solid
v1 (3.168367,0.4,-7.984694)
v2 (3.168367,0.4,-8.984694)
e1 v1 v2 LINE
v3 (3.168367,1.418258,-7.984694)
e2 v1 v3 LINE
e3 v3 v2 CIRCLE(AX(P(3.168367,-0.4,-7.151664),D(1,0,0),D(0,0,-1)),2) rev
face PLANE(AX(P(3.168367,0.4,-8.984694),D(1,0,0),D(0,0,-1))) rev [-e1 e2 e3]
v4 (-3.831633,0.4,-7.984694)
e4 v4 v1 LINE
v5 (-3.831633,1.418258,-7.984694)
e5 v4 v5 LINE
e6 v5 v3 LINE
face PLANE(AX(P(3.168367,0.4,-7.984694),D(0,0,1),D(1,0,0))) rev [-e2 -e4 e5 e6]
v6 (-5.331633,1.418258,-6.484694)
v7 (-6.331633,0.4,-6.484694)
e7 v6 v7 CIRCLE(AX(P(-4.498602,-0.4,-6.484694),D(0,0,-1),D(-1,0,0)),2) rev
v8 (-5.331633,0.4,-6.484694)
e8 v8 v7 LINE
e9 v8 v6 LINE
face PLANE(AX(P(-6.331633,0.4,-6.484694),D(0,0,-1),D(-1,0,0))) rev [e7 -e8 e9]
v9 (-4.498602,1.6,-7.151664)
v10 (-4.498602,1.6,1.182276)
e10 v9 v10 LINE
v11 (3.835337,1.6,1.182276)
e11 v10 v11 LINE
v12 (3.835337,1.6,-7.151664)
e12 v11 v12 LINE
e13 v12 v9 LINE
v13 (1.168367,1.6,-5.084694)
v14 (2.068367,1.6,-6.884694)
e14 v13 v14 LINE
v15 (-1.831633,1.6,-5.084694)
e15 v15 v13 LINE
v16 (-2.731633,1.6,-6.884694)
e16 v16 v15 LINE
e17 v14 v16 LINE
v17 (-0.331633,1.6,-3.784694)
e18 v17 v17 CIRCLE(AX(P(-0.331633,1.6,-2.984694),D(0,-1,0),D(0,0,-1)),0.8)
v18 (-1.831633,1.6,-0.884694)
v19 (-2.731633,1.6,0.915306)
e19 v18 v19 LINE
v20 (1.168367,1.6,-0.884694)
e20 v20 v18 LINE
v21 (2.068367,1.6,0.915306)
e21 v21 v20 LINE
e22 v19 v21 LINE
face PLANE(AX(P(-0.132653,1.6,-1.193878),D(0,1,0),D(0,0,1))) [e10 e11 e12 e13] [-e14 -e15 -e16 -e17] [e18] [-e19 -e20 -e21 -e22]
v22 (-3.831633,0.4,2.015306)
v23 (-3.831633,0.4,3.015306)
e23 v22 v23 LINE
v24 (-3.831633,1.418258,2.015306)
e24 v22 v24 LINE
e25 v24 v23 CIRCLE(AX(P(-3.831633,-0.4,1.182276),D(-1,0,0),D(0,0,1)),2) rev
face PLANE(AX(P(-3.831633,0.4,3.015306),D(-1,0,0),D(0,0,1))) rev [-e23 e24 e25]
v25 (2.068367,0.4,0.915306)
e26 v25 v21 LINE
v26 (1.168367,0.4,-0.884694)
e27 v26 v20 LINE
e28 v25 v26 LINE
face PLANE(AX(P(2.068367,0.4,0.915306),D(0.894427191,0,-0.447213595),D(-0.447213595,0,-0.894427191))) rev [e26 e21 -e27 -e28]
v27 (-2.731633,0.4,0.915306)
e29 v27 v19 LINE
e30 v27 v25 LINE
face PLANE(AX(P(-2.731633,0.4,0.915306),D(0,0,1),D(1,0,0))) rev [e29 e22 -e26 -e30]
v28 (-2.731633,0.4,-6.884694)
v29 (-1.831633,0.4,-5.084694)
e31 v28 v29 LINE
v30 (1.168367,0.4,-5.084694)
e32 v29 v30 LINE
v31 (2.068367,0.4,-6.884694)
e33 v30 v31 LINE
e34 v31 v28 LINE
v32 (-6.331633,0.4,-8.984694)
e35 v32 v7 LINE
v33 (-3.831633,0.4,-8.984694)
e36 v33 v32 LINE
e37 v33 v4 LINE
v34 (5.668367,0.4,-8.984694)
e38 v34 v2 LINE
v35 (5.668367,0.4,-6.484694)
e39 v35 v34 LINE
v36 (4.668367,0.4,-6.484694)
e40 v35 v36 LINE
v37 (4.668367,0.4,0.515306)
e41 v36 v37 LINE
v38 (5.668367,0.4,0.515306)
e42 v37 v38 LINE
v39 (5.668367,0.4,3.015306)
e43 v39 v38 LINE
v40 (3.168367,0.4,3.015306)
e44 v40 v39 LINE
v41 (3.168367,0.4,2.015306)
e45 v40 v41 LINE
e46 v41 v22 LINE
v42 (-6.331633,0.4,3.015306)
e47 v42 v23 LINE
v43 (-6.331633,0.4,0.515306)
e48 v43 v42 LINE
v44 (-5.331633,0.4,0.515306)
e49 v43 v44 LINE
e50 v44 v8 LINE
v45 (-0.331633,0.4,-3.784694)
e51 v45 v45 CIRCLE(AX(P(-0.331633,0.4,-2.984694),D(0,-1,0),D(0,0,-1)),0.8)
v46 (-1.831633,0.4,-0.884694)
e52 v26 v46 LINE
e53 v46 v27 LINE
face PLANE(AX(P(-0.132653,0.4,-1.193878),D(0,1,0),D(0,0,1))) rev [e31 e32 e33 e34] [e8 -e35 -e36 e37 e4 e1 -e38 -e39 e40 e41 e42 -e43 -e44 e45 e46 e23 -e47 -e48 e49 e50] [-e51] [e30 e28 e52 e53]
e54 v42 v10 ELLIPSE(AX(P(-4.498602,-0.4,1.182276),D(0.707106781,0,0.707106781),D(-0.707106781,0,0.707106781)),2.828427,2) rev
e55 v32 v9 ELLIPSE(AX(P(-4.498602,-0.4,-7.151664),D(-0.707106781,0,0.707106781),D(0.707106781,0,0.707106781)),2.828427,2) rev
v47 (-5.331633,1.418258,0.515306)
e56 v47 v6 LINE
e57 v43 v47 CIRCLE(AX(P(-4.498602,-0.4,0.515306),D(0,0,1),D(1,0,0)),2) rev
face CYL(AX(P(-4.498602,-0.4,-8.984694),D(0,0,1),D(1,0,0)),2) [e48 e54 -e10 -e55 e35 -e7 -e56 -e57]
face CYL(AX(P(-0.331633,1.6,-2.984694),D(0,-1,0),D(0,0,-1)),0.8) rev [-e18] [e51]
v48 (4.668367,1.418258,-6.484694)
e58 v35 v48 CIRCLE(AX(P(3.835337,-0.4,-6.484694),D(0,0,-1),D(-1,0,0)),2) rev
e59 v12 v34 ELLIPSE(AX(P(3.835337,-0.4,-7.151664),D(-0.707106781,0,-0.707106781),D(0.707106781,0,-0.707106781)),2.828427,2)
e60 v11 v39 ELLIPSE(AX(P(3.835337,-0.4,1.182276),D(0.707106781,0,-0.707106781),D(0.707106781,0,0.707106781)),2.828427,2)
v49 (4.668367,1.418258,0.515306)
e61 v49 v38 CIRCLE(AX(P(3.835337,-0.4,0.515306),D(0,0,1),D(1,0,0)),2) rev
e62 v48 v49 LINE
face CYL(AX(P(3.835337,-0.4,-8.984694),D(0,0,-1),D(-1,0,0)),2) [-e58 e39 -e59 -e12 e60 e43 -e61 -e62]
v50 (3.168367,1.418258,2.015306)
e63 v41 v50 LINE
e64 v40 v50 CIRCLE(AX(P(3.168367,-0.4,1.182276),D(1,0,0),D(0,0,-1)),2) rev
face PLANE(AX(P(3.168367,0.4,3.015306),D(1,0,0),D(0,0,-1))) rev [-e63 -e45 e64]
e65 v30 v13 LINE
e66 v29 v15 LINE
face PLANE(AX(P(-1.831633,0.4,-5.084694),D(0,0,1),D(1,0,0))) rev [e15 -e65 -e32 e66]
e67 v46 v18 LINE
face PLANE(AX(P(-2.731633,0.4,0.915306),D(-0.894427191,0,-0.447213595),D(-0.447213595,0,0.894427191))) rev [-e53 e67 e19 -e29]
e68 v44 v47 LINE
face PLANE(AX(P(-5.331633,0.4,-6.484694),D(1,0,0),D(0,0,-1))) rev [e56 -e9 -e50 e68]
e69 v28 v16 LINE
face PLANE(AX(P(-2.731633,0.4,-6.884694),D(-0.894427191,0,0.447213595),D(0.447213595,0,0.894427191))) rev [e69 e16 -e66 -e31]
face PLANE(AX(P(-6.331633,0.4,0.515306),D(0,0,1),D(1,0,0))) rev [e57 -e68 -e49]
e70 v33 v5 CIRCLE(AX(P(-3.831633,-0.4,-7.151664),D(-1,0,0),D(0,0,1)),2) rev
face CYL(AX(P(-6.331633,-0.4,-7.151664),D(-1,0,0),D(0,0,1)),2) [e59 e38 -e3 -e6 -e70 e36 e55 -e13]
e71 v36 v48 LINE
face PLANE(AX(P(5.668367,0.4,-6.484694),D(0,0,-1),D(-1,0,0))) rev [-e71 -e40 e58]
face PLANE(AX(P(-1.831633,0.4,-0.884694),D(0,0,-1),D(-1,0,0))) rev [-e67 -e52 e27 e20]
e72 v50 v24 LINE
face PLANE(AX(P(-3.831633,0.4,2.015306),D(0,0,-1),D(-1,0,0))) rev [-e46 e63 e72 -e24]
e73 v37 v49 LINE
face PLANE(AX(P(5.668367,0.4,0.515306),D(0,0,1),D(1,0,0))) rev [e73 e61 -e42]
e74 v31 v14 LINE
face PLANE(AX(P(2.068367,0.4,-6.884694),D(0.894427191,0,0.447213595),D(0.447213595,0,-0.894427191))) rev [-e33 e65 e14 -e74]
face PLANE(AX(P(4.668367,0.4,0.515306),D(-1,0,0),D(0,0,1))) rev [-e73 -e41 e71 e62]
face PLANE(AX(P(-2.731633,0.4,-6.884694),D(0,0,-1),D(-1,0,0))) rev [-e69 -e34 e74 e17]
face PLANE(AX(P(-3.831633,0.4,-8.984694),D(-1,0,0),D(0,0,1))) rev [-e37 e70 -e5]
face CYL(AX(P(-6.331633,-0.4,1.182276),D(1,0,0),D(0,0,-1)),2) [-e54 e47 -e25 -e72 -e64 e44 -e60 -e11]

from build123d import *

# Parameters (mm, degrees)
SKETCH_1_W          = 20
SKETCH_1_H          = 20
EXTRUDE_1_DEPTH     = 2
CUT_EXTRUDE_1_DEPTH = 17.713614462
SCALE_1_SCALE       = 0.6
SKETCH_5_W          = 7
SKETCH_5_H          = 1
SKETCH_5_W_2        = 1
SKETCH_5_H_2        = 7
CUT_EXTRUDE_2_DEPTH = 12.05686647
FILLET_1_R          = 2
SKETCH_6_R          = 0.8
CUT_EXTRUDE_3_DEPTH = 12.05686647


with BuildPart() as part:
    # 草图1 → 凸台-拉伸1 (new body)
    with BuildSketch(Plane(origin=(0, 0, 0), x_dir=(1, 0, 0), z_dir=(0, 1, 0))):
        with Locations((-0.331632653, 2.984693878)):
            Rectangle(SKETCH_1_W, SKETCH_1_H)
    extrude(amount=EXTRUDE_1_DEPTH)

    # 草图2 → 切除-拉伸1 (cut, through all)
    with BuildSketch(Plane(origin=(0, 2, 0), x_dir=(1, 0, 0), z_dir=(0, 1, 0))):
        Polygon((-4.331632653, 9.484693878), (3.668367347, 9.484693878), (2.168367347, 6.484693878), (-2.831632653, 6.484693878), align=None)
        Polygon((3.668367347, -3.515306122), (2.168367347, -0.515306122), (-2.831632653, -0.515306122), (-4.331632653, -3.515306122), align=None)
    extrude(amount=-CUT_EXTRUDE_1_DEPTH, mode=Mode.SUBTRACT)


with BuildPart() as part_1:
    # 缩放比例1: scaled about (-0.331632653, 1, -2.984693878)
    add(part.part.scale(SCALE_1_SCALE).moved(Location((-0.132653061, 0.4, -1.193877551))))

    # 草图5 → 切除-拉伸2 (cut, through all)
    with BuildSketch(Plane(origin=(0, 1.6, 0), x_dir=(1, 0, 0), z_dir=(0, 1, 0))):
        with Locations((-0.331632653, -2.515306122)):
            Rectangle(SKETCH_5_W, SKETCH_5_H)
        with Locations((-5.831632653, 2.984693878)):
            Rectangle(SKETCH_5_W_2, SKETCH_5_H_2)
        with Locations((-0.331632653, 8.484693878)):
            Rectangle(SKETCH_5_W, SKETCH_5_H)
        with Locations((5.168367347, 2.984693878)):
            Rectangle(SKETCH_5_W_2, SKETCH_5_H_2)
    extrude(amount=-CUT_EXTRUDE_2_DEPTH, mode=Mode.SUBTRACT)

    # 圆角1
    # the kernel refuses this fillet: 2 mm, written as the material it takes off along each edge
    with BuildSketch(Plane(origin=(5.668367347, 1.6, -4.067269573), x_dir=(-1, 0, 0), z_dir=(0, 0, 1)), Plane(origin=(-1.414208348, 1.6, -8.984693878), x_dir=(0, 0, 1), z_dir=(1, 0, 0)), Plane(origin=(-6.331632653, 1.6, -1.902118183), x_dir=(1, 0, 0), z_dir=(0, 0, -1)), Plane(origin=(-6.331632653, 1.6, 7.597881817), x_dir=(1, 0, 0), z_dir=(0, 0, -1)), Plane(origin=(10.250943042, 1.6, 3.015306122), x_dir=(0, 0, -1), z_dir=(-1, 0, 0)), Plane(origin=(5.668367347, 1.6, -13.567269573), x_dir=(-1, 0, 0), z_dir=(0, 0, 1)), Plane(origin=(0.750943042, 1.6, 3.015306122), x_dir=(0, 0, -1), z_dir=(-1, 0, 0))) as fillet_1_piece_1:
        with BuildLine():
            CenterArc((1.833030278, 2), FILLET_1_R, 203.578178478, 66.421821522)
            Line((0, 1.2), (0, 0))
            Line((0, 0), (1.833030278, 0))
        make_face()
    extrude(amount=11.66515139, mode=Mode.SUBTRACT)
    with BuildSketch(Plane(origin=(-10.914208348, 1.6, -8.984693878), x_dir=(0, -1, 0), z_dir=(1, 0, 0))) as fillet_1_piece_2:
        with BuildLine():
            CenterArc((2, -1.833030278), FILLET_1_R, 113.578178478, 66.421821522)
            Line((0, -1.833030278), (0, 0))
            Line((0, 0), (1.2, 0))
        make_face()
    extrude(amount=11.66515139, mode=Mode.SUBTRACT)

    # 草图6 → 切除-拉伸3 (cut, through all)
    with BuildSketch(Plane.XZ.offset(-0.4)):
        with Locations(Location((-0.331632653, -2.984693878, 0), (0, 0, 270))):
            Circle(SKETCH_6_R)
    extrude(amount=-CUT_EXTRUDE_3_DEPTH, mode=Mode.SUBTRACT)


solid = part_1.part
